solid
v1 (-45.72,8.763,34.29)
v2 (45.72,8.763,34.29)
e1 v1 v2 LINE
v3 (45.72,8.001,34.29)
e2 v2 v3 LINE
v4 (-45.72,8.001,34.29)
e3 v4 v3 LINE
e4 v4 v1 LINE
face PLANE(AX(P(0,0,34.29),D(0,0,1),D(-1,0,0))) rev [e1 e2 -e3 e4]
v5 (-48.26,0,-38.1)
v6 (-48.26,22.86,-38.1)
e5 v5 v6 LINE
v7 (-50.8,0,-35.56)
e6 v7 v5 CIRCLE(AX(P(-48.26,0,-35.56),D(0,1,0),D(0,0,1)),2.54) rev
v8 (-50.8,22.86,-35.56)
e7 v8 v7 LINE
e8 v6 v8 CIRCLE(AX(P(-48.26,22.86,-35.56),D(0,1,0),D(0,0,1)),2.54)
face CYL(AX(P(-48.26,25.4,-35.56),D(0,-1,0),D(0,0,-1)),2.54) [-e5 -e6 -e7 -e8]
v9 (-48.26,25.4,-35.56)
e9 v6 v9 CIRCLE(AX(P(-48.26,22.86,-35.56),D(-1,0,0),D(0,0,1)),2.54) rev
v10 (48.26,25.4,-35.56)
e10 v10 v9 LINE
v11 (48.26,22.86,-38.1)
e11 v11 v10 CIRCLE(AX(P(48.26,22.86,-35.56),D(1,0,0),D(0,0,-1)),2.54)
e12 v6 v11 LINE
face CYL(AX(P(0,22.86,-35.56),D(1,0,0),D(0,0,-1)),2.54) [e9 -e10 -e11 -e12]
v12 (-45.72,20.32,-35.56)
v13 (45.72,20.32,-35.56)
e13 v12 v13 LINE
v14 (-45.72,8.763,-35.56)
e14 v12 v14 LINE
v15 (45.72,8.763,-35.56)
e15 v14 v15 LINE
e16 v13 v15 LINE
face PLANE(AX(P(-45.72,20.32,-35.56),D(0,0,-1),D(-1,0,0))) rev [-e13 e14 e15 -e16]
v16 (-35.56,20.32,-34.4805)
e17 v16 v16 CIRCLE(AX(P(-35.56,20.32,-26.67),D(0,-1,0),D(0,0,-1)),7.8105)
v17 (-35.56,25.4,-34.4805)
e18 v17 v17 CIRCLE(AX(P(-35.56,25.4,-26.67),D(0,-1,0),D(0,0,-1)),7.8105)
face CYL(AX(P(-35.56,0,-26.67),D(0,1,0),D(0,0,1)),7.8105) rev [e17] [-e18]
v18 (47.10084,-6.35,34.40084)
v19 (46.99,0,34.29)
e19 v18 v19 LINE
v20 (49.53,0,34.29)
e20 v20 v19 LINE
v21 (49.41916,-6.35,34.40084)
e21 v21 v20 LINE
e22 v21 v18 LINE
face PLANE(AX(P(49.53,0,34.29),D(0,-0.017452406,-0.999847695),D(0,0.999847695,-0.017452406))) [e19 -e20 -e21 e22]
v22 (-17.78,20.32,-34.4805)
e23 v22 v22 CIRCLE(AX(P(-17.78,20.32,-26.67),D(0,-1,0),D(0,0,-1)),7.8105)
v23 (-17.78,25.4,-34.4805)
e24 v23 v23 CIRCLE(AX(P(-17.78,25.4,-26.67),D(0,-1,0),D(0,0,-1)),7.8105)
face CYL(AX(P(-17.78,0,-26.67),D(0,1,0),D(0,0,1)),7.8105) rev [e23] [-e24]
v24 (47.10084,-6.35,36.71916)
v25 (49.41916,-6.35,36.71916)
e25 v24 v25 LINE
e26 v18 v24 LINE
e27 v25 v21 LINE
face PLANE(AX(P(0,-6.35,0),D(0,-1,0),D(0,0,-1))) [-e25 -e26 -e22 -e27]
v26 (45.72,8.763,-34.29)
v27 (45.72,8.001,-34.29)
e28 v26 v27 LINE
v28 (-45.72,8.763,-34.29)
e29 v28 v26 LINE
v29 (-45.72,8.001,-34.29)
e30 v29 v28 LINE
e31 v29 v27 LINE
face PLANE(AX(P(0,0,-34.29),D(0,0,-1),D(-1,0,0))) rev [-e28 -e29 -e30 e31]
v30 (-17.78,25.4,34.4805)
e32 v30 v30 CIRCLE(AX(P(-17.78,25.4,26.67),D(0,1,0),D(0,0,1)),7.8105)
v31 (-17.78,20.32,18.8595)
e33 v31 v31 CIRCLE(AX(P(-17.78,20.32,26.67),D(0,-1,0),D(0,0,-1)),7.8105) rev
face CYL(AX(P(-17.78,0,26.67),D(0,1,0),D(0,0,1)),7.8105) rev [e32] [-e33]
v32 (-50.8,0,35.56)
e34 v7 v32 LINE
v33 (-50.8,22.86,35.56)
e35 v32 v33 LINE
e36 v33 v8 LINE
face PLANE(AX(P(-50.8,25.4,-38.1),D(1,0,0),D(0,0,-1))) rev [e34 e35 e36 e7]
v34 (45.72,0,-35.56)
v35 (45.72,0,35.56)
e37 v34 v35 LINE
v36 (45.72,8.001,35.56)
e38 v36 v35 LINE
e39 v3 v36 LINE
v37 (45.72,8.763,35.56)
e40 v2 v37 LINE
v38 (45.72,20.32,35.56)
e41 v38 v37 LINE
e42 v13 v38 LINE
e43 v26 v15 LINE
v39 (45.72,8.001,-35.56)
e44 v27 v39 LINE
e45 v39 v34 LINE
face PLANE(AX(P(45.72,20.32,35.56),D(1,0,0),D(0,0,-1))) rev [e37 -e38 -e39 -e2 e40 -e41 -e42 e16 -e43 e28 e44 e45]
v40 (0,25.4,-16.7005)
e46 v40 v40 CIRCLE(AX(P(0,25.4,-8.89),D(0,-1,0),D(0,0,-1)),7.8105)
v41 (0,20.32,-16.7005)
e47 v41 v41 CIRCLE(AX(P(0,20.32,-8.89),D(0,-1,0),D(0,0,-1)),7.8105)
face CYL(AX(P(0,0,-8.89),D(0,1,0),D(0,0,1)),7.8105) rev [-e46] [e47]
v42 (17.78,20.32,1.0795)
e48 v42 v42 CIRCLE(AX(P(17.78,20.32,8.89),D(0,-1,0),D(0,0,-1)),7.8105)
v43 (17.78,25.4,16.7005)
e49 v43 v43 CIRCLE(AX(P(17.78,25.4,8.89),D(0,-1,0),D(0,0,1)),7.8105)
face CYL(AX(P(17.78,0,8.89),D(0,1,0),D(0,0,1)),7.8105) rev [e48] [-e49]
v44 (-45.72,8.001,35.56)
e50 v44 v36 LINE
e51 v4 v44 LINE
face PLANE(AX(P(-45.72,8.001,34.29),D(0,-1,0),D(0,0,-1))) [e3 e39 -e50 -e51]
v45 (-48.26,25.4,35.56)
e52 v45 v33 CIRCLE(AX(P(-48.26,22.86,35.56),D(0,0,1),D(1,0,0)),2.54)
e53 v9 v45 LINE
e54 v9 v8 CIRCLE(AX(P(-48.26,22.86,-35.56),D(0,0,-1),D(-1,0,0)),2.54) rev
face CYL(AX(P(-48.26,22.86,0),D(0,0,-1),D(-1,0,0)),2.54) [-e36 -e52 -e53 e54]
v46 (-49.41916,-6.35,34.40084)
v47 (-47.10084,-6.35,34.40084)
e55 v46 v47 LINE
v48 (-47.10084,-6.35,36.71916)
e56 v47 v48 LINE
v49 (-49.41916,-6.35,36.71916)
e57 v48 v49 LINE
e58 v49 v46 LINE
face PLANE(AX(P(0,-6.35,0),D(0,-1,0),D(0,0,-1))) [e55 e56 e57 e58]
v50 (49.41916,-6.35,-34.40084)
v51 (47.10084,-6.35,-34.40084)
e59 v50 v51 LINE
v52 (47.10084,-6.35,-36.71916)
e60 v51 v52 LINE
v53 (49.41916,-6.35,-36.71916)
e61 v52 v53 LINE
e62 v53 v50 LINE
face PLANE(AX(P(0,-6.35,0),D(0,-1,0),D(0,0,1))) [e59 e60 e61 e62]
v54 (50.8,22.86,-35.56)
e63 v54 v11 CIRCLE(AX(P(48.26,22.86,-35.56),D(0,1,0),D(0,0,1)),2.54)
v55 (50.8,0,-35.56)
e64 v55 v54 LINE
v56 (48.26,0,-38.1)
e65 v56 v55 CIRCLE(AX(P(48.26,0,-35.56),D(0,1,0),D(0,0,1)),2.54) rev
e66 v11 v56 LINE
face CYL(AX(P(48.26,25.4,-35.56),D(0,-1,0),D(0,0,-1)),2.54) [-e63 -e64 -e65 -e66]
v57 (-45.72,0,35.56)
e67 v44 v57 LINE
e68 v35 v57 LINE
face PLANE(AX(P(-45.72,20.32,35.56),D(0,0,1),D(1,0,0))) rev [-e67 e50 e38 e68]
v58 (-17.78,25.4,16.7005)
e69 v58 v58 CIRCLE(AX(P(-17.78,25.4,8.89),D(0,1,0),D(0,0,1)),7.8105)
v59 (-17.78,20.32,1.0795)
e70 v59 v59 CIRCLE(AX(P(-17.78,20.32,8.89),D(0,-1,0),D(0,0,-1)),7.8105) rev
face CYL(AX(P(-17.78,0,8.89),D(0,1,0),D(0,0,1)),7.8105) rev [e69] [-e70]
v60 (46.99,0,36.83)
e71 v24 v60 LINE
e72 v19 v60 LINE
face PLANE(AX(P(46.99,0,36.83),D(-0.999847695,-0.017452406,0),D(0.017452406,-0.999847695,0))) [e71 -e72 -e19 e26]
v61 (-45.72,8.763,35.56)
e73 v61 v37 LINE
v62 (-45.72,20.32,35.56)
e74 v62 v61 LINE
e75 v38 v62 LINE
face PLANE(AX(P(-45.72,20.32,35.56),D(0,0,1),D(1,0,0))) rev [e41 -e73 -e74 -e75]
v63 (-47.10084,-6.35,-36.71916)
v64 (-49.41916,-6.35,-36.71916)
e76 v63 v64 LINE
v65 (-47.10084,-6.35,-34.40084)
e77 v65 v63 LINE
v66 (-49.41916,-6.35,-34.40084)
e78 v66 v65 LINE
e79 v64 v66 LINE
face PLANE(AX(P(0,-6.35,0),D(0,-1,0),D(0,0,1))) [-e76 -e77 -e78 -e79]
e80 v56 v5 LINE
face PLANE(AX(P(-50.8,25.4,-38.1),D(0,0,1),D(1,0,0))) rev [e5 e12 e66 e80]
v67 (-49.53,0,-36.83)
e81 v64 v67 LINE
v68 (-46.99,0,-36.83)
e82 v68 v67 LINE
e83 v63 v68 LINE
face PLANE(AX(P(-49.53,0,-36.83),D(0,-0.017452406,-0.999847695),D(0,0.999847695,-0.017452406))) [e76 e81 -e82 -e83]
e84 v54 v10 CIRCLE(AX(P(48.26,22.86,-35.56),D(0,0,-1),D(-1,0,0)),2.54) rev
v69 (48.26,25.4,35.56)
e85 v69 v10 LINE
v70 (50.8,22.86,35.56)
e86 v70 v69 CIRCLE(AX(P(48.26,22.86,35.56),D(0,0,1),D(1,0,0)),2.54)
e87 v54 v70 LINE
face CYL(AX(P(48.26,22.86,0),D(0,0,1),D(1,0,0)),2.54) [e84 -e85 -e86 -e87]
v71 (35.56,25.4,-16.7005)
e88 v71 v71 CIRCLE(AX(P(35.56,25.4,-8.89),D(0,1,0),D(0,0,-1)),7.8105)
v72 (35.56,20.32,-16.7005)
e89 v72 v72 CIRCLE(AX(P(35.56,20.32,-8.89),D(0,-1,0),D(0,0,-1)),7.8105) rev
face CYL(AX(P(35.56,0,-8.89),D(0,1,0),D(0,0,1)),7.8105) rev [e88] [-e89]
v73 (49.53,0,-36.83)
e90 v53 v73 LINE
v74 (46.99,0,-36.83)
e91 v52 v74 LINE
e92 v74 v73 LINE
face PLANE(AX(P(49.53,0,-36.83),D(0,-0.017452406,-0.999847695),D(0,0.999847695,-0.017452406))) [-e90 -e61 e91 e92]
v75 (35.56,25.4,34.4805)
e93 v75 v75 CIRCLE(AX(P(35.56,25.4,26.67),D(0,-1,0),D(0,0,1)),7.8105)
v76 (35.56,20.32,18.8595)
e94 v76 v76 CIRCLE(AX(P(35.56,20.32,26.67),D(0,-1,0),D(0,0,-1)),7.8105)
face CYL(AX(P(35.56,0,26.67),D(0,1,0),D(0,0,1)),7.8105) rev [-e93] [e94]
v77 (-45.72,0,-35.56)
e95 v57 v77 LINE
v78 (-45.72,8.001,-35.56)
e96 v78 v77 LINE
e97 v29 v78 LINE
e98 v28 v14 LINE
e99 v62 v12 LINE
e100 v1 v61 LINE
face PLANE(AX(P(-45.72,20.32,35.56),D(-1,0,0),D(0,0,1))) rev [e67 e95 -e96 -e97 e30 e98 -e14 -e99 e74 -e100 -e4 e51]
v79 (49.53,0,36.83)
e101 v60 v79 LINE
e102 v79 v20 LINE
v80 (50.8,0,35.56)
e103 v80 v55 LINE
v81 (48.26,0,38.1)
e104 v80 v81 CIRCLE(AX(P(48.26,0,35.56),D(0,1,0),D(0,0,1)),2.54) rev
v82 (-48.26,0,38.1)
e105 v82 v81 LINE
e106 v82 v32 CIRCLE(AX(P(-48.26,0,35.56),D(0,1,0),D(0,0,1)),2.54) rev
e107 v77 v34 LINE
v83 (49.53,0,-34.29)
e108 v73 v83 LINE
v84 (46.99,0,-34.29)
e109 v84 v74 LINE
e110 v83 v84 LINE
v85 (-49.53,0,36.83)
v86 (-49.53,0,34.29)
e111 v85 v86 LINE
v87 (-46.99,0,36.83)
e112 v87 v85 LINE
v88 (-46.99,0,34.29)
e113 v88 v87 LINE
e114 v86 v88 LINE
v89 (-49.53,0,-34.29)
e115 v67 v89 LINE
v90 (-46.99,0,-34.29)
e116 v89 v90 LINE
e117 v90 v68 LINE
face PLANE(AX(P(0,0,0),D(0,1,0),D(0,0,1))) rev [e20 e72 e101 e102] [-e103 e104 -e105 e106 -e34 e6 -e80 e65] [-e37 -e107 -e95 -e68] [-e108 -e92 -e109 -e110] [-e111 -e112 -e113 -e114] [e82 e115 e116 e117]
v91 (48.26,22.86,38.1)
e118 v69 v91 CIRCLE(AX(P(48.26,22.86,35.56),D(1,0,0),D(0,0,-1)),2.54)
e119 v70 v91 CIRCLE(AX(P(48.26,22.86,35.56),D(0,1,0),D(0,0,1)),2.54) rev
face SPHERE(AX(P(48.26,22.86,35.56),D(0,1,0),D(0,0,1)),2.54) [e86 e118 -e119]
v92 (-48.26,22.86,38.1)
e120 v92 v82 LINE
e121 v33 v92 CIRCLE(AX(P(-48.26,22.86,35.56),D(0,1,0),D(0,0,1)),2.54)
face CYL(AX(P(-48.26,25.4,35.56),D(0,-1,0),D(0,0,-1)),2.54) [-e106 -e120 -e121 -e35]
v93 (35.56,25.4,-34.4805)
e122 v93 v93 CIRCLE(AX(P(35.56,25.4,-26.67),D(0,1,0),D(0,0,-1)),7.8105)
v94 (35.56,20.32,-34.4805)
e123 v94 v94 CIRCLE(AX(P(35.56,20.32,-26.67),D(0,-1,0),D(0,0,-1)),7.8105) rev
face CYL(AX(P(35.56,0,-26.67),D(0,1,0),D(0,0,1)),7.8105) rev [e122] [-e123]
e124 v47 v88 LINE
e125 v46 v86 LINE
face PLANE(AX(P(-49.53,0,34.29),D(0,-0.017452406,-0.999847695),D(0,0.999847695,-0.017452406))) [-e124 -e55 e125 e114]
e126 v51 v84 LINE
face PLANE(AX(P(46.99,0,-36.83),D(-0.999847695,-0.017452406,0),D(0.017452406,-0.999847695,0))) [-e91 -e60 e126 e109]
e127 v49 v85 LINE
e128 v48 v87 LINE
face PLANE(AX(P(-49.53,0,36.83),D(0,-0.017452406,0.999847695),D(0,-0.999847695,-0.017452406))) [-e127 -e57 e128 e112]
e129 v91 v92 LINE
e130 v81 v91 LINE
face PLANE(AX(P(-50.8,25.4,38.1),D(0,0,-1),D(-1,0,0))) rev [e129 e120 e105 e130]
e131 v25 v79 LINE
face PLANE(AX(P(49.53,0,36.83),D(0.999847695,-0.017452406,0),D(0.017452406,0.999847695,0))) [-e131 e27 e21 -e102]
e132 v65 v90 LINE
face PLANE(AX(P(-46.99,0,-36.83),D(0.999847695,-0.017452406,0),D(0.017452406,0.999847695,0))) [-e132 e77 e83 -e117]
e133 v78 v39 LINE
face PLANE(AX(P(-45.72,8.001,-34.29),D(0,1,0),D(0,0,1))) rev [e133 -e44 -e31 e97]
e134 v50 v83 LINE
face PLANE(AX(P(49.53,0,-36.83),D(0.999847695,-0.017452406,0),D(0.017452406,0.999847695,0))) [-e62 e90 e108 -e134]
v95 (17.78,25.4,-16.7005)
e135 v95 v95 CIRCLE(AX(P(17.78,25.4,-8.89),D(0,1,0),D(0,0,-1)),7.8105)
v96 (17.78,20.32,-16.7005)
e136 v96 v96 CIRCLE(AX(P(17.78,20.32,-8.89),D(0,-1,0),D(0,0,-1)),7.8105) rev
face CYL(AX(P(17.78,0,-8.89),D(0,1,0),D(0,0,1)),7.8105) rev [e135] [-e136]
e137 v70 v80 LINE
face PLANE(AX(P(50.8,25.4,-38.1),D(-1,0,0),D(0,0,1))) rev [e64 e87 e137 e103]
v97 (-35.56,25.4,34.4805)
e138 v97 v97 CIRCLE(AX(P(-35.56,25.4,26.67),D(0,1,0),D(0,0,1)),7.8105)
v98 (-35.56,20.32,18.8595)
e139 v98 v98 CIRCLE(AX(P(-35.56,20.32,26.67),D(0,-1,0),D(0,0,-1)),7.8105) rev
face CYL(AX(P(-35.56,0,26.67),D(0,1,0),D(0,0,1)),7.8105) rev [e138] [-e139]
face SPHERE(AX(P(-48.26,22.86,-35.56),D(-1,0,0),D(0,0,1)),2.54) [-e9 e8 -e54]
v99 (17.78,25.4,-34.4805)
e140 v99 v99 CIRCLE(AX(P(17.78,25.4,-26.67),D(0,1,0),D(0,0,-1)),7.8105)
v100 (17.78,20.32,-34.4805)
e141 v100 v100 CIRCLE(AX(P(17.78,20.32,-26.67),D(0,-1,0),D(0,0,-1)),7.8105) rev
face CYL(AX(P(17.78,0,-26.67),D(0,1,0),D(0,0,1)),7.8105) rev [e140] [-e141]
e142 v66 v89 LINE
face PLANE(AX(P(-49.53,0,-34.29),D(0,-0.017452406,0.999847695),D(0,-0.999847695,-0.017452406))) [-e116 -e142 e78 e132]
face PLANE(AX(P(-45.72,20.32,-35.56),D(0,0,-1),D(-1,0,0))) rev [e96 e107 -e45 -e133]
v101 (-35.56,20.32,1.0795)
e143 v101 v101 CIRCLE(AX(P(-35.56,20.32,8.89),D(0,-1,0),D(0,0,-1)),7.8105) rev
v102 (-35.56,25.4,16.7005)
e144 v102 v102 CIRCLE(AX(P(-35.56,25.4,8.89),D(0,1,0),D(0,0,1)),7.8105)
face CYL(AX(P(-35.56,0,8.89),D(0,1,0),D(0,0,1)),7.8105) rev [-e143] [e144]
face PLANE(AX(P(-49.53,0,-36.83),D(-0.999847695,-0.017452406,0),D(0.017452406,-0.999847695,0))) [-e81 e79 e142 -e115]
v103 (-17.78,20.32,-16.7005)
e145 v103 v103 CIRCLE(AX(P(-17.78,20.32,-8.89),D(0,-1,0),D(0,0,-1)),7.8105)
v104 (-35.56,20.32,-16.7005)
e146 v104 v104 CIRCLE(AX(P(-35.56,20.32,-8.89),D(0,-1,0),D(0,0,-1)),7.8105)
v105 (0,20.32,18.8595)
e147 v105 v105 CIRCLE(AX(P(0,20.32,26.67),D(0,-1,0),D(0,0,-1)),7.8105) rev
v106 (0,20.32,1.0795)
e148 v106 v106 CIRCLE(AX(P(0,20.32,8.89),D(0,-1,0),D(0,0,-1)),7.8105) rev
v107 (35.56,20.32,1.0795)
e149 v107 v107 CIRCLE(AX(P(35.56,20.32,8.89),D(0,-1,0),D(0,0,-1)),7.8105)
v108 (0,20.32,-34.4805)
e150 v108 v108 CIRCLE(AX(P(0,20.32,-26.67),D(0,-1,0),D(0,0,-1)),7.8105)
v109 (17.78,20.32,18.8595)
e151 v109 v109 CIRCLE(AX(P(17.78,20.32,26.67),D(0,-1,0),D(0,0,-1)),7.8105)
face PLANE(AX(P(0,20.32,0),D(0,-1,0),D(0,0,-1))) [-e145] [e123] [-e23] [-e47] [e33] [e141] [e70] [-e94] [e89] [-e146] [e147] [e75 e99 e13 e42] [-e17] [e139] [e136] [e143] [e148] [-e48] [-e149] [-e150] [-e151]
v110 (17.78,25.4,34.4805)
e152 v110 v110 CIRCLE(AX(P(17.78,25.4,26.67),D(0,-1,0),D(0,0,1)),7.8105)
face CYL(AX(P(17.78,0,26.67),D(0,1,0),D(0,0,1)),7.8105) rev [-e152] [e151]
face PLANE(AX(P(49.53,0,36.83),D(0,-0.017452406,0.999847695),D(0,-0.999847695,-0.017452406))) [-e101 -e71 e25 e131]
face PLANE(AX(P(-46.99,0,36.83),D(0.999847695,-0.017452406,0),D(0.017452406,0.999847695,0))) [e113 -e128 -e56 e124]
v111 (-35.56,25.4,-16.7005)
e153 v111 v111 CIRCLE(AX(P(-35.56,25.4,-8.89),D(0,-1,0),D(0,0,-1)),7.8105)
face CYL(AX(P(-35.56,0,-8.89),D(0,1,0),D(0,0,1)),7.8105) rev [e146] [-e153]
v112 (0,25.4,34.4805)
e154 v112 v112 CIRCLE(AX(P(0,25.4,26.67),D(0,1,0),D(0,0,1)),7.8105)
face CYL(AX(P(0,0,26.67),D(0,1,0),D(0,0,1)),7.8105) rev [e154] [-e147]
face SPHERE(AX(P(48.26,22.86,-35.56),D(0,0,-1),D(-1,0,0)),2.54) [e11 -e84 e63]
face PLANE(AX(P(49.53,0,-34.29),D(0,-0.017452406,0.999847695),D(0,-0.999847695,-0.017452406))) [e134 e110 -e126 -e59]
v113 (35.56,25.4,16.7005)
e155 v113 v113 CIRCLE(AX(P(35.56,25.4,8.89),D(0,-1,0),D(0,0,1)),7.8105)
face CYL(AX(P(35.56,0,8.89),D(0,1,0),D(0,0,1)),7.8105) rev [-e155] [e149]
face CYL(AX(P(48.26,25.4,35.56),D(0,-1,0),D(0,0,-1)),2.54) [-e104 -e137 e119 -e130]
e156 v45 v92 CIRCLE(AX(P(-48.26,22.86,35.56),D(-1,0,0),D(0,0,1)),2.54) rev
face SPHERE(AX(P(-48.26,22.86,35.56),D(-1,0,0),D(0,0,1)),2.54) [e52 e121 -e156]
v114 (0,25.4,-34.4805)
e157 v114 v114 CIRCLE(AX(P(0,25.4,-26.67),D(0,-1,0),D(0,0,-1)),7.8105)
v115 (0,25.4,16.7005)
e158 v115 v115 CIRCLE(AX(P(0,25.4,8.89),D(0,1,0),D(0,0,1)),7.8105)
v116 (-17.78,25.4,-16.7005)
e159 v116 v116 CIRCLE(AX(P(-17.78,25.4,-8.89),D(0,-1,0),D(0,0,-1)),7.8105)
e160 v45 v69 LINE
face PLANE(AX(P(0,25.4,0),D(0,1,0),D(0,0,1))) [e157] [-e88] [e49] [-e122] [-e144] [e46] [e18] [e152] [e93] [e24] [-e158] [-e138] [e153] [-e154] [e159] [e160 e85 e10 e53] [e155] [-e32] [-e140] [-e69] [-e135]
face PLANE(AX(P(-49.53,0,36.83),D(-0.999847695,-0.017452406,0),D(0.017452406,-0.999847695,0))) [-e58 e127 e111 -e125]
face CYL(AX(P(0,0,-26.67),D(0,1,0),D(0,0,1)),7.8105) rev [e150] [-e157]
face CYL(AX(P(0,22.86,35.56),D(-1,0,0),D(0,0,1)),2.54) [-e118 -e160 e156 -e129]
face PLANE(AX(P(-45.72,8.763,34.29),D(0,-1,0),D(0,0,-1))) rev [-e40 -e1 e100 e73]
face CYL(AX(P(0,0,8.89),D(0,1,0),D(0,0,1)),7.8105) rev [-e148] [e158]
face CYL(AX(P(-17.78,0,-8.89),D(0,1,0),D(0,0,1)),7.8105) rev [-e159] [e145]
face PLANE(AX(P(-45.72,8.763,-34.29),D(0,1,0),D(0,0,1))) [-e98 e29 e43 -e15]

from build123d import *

# Parameters (mm, degrees)
SKETCH1_W                 = 101.6
SKETCH1_H                 = 76.2
BOSS_EXTRUDE1_DEPTH       = 25.4
HOLE1_OUTLINE_R           = 7.8105
HOLE1_DEPTH               = 25.4
HOLE2_OUTLINE_R           = 7.8105
HOLE2_DEPTH               = 25.4
LPATTERN1_COUNT           = 2
LPATTERN1_PITCH           = 17.78
LPATTERN1_COPY_1_SKETCH_R = 7.8105
LPATTERN1_COPY_1_DEPTH    = 25.4
LPATTERN1_COPY_2_SKETCH_R = 7.8105
LPATTERN1_COPY_2_DEPTH    = 25.4
LPATTERN2_COPY_1_SKETCH_R = 7.8105
LPATTERN2_COPY_1_DEPTH    = 25.4
LPATTERN2_COPY_2_SKETCH_R = 7.8105
LPATTERN2_COPY_2_DEPTH    = 25.4
LPATTERN2_COPY_3_SKETCH_R = 7.8105
LPATTERN2_COPY_3_DEPTH    = 25.4
LPATTERN2_COPY_4_SKETCH_R = 7.8105
LPATTERN2_COPY_4_DEPTH    = 25.4
LPATTERN2_COPY_5_SKETCH_R = 7.8105
LPATTERN2_COPY_5_DEPTH    = 25.4
LPATTERN2_COPY_6_SKETCH_R = 7.8105
LPATTERN2_COPY_6_DEPTH    = 25.4
MIRROR2_COPY_1_SKETCH_R   = 7.8105
MIRROR2_COPY_1_DEPTH      = 25.4
MIRROR2_COPY_2_SKETCH_R   = 7.8105
MIRROR2_COPY_2_DEPTH      = 25.4
MIRROR2_COPY_3_SKETCH_R   = 7.8105
MIRROR2_COPY_3_DEPTH      = 25.4
MIRROR2_COPY_4_SKETCH_R   = 7.8105
MIRROR2_COPY_4_DEPTH      = 25.4
MIRROR2_COPY_5_SKETCH_R   = 7.8105
MIRROR2_COPY_5_DEPTH      = 25.4
MIRROR2_COPY_6_SKETCH_R   = 7.8105
MIRROR2_COPY_6_DEPTH      = 25.4
MIRROR2_COPY_7_SKETCH_R   = 7.8105
MIRROR2_COPY_7_DEPTH      = 25.4
MIRROR2_COPY_8_SKETCH_R   = 7.8105
MIRROR2_COPY_8_DEPTH      = 25.4
MIRROR2_COPY_9_SKETCH_R   = 7.8105
MIRROR2_COPY_9_DEPTH      = 25.4
MIRROR2_COPY_10_SKETCH_R  = 7.8105
MIRROR2_COPY_10_DEPTH     = 25.4
MIRROR2_COPY_11_SKETCH_R  = 7.8105
MIRROR2_COPY_11_DEPTH     = 25.4
MIRROR2_COPY_12_SKETCH_R  = 7.8105
MIRROR2_COPY_12_DEPTH     = 25.4
MIRROR2_COPY_13_SKETCH_R  = 7.8105
MIRROR2_COPY_13_DEPTH     = 25.4
MIRROR2_COPY_14_SKETCH_R  = 7.8105
MIRROR2_COPY_14_DEPTH     = 25.4
SKETCH5_W                 = 91.44
SKETCH5_H                 = 71.12
CUT_EXTRUDE1_DEPTH        = 20.32
FILLET1_R                 = 2.54
SKETCH7_W                 = 2.54
SKETCH7_H                 = 2.54
BOSS_EXTRUDE2_DEPTH       = 6.35
BOSS_EXTRUDE2_TAPER       = 1
MIRROR4_COPY_1_SKETCH_W   = 2.54
MIRROR4_COPY_1_SKETCH_H   = 2.54
MIRROR4_COPY_1_DEPTH      = 6.35
MIRROR4_COPY_1_TAPER      = 1
SKETCH9_W                 = 91.44
SKETCH9_H                 = 0.762
EXTRUDE_THIN1_DEPTH       = 1.27


# Read off the part's stored shape, not the designer's step: Hole1, Hole2
with BuildPart() as part:
    # Sketch1 → Boss-Extrude1 (new body)
    with BuildSketch(Plane(origin=(0, 0, 0), x_dir=(1, 0, 0), z_dir=(0, 1, 0))):
        Rectangle(SKETCH1_W, SKETCH1_H)
    extrude(amount=BOSS_EXTRUDE1_DEPTH)

    # Hole1 outline → Hole1 (cut)
    with BuildSketch(Plane(origin=(0, 0, 0), x_dir=(1, 0, 0), z_dir=(0, 1, 0))):
        with Locations((0, -8.89)):
            Circle(HOLE1_OUTLINE_R)
    hole1 = extrude(amount=HOLE1_DEPTH, mode=Mode.SUBTRACT)

    # Hole2 outline → Hole2 (cut)
    with BuildSketch(Plane(origin=(0, 0, 0), x_dir=(1, 0, 0), z_dir=(0, 1, 0))):
        with Locations((0, -26.67)):
            Circle(HOLE2_OUTLINE_R)
    hole2 = extrude(amount=HOLE2_DEPTH, mode=Mode.SUBTRACT)

    # Mirror1: Hole1, Hole2 across plane
    add(hole1.mirror(Plane.XY), mode=Mode.SUBTRACT)
    add(hole2.mirror(Plane.XY), mode=Mode.SUBTRACT)

    # LPattern1: Hole1, Hole2 ×2
    with Locations(*[(-i * LPATTERN1_PITCH, 0, 0) for i in range(1, LPATTERN1_COUNT)]):
        add(hole1, mode=Mode.SUBTRACT)
        add(hole2, mode=Mode.SUBTRACT)

    # LPattern1 copy 1 sketch → LPattern1 copy 1 (cut)
    with BuildSketch(Plane(origin=(-17.78, 0, 0), x_dir=(1, 0, 0), z_dir=(0, 1, 0))):
        with Locations((0, 8.89)):
            Circle(LPATTERN1_COPY_1_SKETCH_R)
    extrude(amount=LPATTERN1_COPY_1_DEPTH, mode=Mode.SUBTRACT)

    # LPattern1 copy 2 sketch → LPattern1 copy 2 (cut)
    with BuildSketch(Plane(origin=(-17.78, 0, 0), x_dir=(1, 0, 0), z_dir=(0, 1, 0))):
        with Locations((0, 26.67)):
            Circle(LPATTERN1_COPY_2_SKETCH_R)
    extrude(amount=LPATTERN1_COPY_2_DEPTH, mode=Mode.SUBTRACT)

    # LPattern2 copy 1 sketch → LPattern2 copy 1 (cut)
    with BuildSketch(Plane(origin=(-35.56, 0, 0), x_dir=(1, 0, 0), z_dir=(0, 1, 0))):
        with Locations((0, -8.89)):
            Circle(LPATTERN2_COPY_1_SKETCH_R)
    extrude(amount=LPATTERN2_COPY_1_DEPTH, mode=Mode.SUBTRACT)

    # LPattern2 copy 2 sketch → LPattern2 copy 2 (cut)
    with BuildSketch(Plane(origin=(-35.56, 0, 0), x_dir=(1, 0, 0), z_dir=(0, 1, 0))):
        with Locations((0, -26.67)):
            Circle(LPATTERN2_COPY_2_SKETCH_R)
    extrude(amount=LPATTERN2_COPY_2_DEPTH, mode=Mode.SUBTRACT)

    # LPattern2 copy 3 sketch → LPattern2 copy 3 (cut)
    with BuildSketch(Plane(origin=(-35.56, 0, 0), x_dir=(1, 0, 0), z_dir=(0, 1, 0))):
        with Locations((0, 8.89)):
            Circle(LPATTERN2_COPY_3_SKETCH_R)
    extrude(amount=LPATTERN2_COPY_3_DEPTH, mode=Mode.SUBTRACT)

    # LPattern2 copy 4 sketch → LPattern2 copy 4 (cut)
    with BuildSketch(Plane(origin=(-35.56, 0, 0), x_dir=(1, 0, 0), z_dir=(0, 1, 0))):
        with Locations((0, 26.67)):
            Circle(LPATTERN2_COPY_4_SKETCH_R)
    extrude(amount=LPATTERN2_COPY_4_DEPTH, mode=Mode.SUBTRACT)

    # LPattern2 copy 5 sketch → LPattern2 copy 5 (cut)
    with BuildSketch(Plane(origin=(-17.78, 0, 0), x_dir=(1, 0, 0), z_dir=(0, 1, 0))):
        with Locations((0, -8.89)):
            Circle(LPATTERN2_COPY_5_SKETCH_R)
    extrude(amount=LPATTERN2_COPY_5_DEPTH, mode=Mode.SUBTRACT)

    # LPattern2 copy 6 sketch → LPattern2 copy 6 (cut)
    with BuildSketch(Plane(origin=(-17.78, 0, 0), x_dir=(1, 0, 0), z_dir=(0, 1, 0))):
        with Locations((0, -26.67)):
            Circle(LPATTERN2_COPY_6_SKETCH_R)
    extrude(amount=LPATTERN2_COPY_6_DEPTH, mode=Mode.SUBTRACT)

    # Mirror2 copy 1 sketch → Mirror2 copy 1 (cut)
    with BuildSketch(Plane(origin=(17.78, 0, 0), x_dir=(-1, 0, 0), z_dir=(0, 1, 0))):
        with Locations((0, 8.89)):
            Circle(MIRROR2_COPY_1_SKETCH_R)
    extrude(amount=MIRROR2_COPY_1_DEPTH, mode=Mode.SUBTRACT)

    # Mirror2 copy 2 sketch → Mirror2 copy 2 (cut)
    with BuildSketch(Plane(origin=(17.78, 0, 0), x_dir=(-1, 0, 0), z_dir=(0, 1, 0))):
        with Locations((0, 26.67)):
            Circle(MIRROR2_COPY_2_SKETCH_R)
    extrude(amount=MIRROR2_COPY_2_DEPTH, mode=Mode.SUBTRACT)

    # Mirror2 copy 3 sketch → Mirror2 copy 3 (cut)
    with BuildSketch(Plane(origin=(17.78, 0, 0), x_dir=(-1, 0, 0), z_dir=(0, 1, 0))):
        with Locations((0, -8.89)):
            Circle(MIRROR2_COPY_3_SKETCH_R)
    extrude(amount=MIRROR2_COPY_3_DEPTH, mode=Mode.SUBTRACT)

    # Mirror2 copy 4 sketch → Mirror2 copy 4 (cut)
    with BuildSketch(Plane(origin=(17.78, 0, 0), x_dir=(-1, 0, 0), z_dir=(0, 1, 0))):
        with Locations((0, -26.67)):
            Circle(MIRROR2_COPY_4_SKETCH_R)
    extrude(amount=MIRROR2_COPY_4_DEPTH, mode=Mode.SUBTRACT)

    # Mirror2 copy 5 sketch → Mirror2 copy 5 (cut)
    with BuildSketch(Plane(origin=(0, 0, 0), x_dir=(-1, 0, 0), z_dir=(0, 1, 0))):
        with Locations((0, 8.89)):
            Circle(MIRROR2_COPY_5_SKETCH_R)
    extrude(amount=MIRROR2_COPY_5_DEPTH, mode=Mode.SUBTRACT)

    # Mirror2 copy 6 sketch → Mirror2 copy 6 (cut)
    with BuildSketch(Plane(origin=(0, 0, 0), x_dir=(-1, 0, 0), z_dir=(0, 1, 0))):
        with Locations((0, 26.67)):
            Circle(MIRROR2_COPY_6_SKETCH_R)
    extrude(amount=MIRROR2_COPY_6_DEPTH, mode=Mode.SUBTRACT)

    # Mirror2 copy 7 sketch → Mirror2 copy 7 (cut)
    with BuildSketch(Plane(origin=(35.56, 0, 0), x_dir=(-1, 0, 0), z_dir=(0, 1, 0))):
        with Locations((0, 8.89)):
            Circle(MIRROR2_COPY_7_SKETCH_R)
    extrude(amount=MIRROR2_COPY_7_DEPTH, mode=Mode.SUBTRACT)

    # Mirror2 copy 8 sketch → Mirror2 copy 8 (cut)
    with BuildSketch(Plane(origin=(35.56, 0, 0), x_dir=(-1, 0, 0), z_dir=(0, 1, 0))):
        with Locations((0, 26.67)):
            Circle(MIRROR2_COPY_8_SKETCH_R)
    extrude(amount=MIRROR2_COPY_8_DEPTH, mode=Mode.SUBTRACT)

    # Mirror2 copy 9 sketch → Mirror2 copy 9 (cut)
    with BuildSketch(Plane(origin=(35.56, 0, 0), x_dir=(-1, 0, 0), z_dir=(0, 1, 0))):
        with Locations((0, -8.89)):
            Circle(MIRROR2_COPY_9_SKETCH_R)
    extrude(amount=MIRROR2_COPY_9_DEPTH, mode=Mode.SUBTRACT)

    # Mirror2 copy 10 sketch → Mirror2 copy 10 (cut)
    with BuildSketch(Plane(origin=(35.56, 0, 0), x_dir=(-1, 0, 0), z_dir=(0, 1, 0))):
        with Locations((0, -26.67)):
            Circle(MIRROR2_COPY_10_SKETCH_R)
    extrude(amount=MIRROR2_COPY_10_DEPTH, mode=Mode.SUBTRACT)

    # Mirror2 copy 11 sketch → Mirror2 copy 11 (cut)
    with BuildSketch(Plane(origin=(17.78, 0, 0), x_dir=(-1, 0, 0), z_dir=(0, 1, 0))):
        with Locations((0, 8.89)):
            Circle(MIRROR2_COPY_11_SKETCH_R)
    extrude(amount=MIRROR2_COPY_11_DEPTH, mode=Mode.SUBTRACT)

    # Mirror2 copy 12 sketch → Mirror2 copy 12 (cut)
    with BuildSketch(Plane(origin=(17.78, 0, 0), x_dir=(-1, 0, 0), z_dir=(0, 1, 0))):
        with Locations((0, 26.67)):
            Circle(MIRROR2_COPY_12_SKETCH_R)
    extrude(amount=MIRROR2_COPY_12_DEPTH, mode=Mode.SUBTRACT)

    # Mirror2 copy 13 sketch → Mirror2 copy 13 (cut)
    with BuildSketch(Plane(origin=(0, 0, 0), x_dir=(-1, 0, 0), z_dir=(0, 1, 0))):
        with Locations((0, 8.89)):
            Circle(MIRROR2_COPY_13_SKETCH_R)
    extrude(amount=MIRROR2_COPY_13_DEPTH, mode=Mode.SUBTRACT)

    # Mirror2 copy 14 sketch → Mirror2 copy 14 (cut)
    with BuildSketch(Plane(origin=(0, 0, 0), x_dir=(-1, 0, 0), z_dir=(0, 1, 0))):
        with Locations((0, 26.67)):
            Circle(MIRROR2_COPY_14_SKETCH_R)
    extrude(amount=MIRROR2_COPY_14_DEPTH, mode=Mode.SUBTRACT)

    # Sketch5 → Cut-Extrude1 (cut)
    with BuildSketch(Plane.XZ):
        Rectangle(SKETCH5_W, SKETCH5_H)
    extrude(amount=-CUT_EXTRUDE1_DEPTH, mode=Mode.SUBTRACT)

    # Fillet1
    fillet1_edges = [part.edges().sort_by_distance(p)[0] for p in [
        (-50.8, 25.4, 0),
        (0, 25.4, 38.1),
        (50.8, 25.4, 0),
        (50.8, 12.7, 38.1),
        (-50.8, 12.7, 38.1),
        (-50.8, 12.7, -38.1),
        (50.8, 12.7, -38.1),
        (0, 25.4, -38.1),
    ]]
    fillet(fillet1_edges, radius=FILLET1_R)

    # Sketch7 → Boss-Extrude2 (add)
    with BuildSketch(Plane(origin=(0, 0, 0), x_dir=(-1, 0, 0), z_dir=(0, -1, 0))):
        with Locations((48.26, -35.56)):
            Rectangle(SKETCH7_W, SKETCH7_H)
    boss_extrude2 = extrude(amount=BOSS_EXTRUDE2_DEPTH, taper=BOSS_EXTRUDE2_TAPER)

    # Mirror3: Boss-Extrude2 across plane
    add(boss_extrude2.mirror(Plane(origin=(0, 0, 0), x_dir=(0, 0, 1), z_dir=(1, 0, 0))))

    # Mirror4: Boss-Extrude2 across plane
    add(boss_extrude2.mirror(Plane.XY))

    # Mirror4 copy 1 sketch → Mirror4 copy 1 (add)
    with BuildSketch(Plane.XZ):
        with Locations((48.26, -35.56)):
            Rectangle(MIRROR4_COPY_1_SKETCH_W, MIRROR4_COPY_1_SKETCH_H)
    extrude(amount=MIRROR4_COPY_1_DEPTH, taper=MIRROR4_COPY_1_TAPER)

    # Sketch9 → Extrude-Thin1 (add)
    with BuildSketch(Plane.XY.offset(-35.56)):
        with Locations((0, 8.382)):
            Rectangle(SKETCH9_W, SKETCH9_H)
    extrude_thin1 = extrude(amount=EXTRUDE_THIN1_DEPTH)

    # Mirror5: Extrude-Thin1 across plane
    add(extrude_thin1.mirror(Plane.XY))


solid = part.part
